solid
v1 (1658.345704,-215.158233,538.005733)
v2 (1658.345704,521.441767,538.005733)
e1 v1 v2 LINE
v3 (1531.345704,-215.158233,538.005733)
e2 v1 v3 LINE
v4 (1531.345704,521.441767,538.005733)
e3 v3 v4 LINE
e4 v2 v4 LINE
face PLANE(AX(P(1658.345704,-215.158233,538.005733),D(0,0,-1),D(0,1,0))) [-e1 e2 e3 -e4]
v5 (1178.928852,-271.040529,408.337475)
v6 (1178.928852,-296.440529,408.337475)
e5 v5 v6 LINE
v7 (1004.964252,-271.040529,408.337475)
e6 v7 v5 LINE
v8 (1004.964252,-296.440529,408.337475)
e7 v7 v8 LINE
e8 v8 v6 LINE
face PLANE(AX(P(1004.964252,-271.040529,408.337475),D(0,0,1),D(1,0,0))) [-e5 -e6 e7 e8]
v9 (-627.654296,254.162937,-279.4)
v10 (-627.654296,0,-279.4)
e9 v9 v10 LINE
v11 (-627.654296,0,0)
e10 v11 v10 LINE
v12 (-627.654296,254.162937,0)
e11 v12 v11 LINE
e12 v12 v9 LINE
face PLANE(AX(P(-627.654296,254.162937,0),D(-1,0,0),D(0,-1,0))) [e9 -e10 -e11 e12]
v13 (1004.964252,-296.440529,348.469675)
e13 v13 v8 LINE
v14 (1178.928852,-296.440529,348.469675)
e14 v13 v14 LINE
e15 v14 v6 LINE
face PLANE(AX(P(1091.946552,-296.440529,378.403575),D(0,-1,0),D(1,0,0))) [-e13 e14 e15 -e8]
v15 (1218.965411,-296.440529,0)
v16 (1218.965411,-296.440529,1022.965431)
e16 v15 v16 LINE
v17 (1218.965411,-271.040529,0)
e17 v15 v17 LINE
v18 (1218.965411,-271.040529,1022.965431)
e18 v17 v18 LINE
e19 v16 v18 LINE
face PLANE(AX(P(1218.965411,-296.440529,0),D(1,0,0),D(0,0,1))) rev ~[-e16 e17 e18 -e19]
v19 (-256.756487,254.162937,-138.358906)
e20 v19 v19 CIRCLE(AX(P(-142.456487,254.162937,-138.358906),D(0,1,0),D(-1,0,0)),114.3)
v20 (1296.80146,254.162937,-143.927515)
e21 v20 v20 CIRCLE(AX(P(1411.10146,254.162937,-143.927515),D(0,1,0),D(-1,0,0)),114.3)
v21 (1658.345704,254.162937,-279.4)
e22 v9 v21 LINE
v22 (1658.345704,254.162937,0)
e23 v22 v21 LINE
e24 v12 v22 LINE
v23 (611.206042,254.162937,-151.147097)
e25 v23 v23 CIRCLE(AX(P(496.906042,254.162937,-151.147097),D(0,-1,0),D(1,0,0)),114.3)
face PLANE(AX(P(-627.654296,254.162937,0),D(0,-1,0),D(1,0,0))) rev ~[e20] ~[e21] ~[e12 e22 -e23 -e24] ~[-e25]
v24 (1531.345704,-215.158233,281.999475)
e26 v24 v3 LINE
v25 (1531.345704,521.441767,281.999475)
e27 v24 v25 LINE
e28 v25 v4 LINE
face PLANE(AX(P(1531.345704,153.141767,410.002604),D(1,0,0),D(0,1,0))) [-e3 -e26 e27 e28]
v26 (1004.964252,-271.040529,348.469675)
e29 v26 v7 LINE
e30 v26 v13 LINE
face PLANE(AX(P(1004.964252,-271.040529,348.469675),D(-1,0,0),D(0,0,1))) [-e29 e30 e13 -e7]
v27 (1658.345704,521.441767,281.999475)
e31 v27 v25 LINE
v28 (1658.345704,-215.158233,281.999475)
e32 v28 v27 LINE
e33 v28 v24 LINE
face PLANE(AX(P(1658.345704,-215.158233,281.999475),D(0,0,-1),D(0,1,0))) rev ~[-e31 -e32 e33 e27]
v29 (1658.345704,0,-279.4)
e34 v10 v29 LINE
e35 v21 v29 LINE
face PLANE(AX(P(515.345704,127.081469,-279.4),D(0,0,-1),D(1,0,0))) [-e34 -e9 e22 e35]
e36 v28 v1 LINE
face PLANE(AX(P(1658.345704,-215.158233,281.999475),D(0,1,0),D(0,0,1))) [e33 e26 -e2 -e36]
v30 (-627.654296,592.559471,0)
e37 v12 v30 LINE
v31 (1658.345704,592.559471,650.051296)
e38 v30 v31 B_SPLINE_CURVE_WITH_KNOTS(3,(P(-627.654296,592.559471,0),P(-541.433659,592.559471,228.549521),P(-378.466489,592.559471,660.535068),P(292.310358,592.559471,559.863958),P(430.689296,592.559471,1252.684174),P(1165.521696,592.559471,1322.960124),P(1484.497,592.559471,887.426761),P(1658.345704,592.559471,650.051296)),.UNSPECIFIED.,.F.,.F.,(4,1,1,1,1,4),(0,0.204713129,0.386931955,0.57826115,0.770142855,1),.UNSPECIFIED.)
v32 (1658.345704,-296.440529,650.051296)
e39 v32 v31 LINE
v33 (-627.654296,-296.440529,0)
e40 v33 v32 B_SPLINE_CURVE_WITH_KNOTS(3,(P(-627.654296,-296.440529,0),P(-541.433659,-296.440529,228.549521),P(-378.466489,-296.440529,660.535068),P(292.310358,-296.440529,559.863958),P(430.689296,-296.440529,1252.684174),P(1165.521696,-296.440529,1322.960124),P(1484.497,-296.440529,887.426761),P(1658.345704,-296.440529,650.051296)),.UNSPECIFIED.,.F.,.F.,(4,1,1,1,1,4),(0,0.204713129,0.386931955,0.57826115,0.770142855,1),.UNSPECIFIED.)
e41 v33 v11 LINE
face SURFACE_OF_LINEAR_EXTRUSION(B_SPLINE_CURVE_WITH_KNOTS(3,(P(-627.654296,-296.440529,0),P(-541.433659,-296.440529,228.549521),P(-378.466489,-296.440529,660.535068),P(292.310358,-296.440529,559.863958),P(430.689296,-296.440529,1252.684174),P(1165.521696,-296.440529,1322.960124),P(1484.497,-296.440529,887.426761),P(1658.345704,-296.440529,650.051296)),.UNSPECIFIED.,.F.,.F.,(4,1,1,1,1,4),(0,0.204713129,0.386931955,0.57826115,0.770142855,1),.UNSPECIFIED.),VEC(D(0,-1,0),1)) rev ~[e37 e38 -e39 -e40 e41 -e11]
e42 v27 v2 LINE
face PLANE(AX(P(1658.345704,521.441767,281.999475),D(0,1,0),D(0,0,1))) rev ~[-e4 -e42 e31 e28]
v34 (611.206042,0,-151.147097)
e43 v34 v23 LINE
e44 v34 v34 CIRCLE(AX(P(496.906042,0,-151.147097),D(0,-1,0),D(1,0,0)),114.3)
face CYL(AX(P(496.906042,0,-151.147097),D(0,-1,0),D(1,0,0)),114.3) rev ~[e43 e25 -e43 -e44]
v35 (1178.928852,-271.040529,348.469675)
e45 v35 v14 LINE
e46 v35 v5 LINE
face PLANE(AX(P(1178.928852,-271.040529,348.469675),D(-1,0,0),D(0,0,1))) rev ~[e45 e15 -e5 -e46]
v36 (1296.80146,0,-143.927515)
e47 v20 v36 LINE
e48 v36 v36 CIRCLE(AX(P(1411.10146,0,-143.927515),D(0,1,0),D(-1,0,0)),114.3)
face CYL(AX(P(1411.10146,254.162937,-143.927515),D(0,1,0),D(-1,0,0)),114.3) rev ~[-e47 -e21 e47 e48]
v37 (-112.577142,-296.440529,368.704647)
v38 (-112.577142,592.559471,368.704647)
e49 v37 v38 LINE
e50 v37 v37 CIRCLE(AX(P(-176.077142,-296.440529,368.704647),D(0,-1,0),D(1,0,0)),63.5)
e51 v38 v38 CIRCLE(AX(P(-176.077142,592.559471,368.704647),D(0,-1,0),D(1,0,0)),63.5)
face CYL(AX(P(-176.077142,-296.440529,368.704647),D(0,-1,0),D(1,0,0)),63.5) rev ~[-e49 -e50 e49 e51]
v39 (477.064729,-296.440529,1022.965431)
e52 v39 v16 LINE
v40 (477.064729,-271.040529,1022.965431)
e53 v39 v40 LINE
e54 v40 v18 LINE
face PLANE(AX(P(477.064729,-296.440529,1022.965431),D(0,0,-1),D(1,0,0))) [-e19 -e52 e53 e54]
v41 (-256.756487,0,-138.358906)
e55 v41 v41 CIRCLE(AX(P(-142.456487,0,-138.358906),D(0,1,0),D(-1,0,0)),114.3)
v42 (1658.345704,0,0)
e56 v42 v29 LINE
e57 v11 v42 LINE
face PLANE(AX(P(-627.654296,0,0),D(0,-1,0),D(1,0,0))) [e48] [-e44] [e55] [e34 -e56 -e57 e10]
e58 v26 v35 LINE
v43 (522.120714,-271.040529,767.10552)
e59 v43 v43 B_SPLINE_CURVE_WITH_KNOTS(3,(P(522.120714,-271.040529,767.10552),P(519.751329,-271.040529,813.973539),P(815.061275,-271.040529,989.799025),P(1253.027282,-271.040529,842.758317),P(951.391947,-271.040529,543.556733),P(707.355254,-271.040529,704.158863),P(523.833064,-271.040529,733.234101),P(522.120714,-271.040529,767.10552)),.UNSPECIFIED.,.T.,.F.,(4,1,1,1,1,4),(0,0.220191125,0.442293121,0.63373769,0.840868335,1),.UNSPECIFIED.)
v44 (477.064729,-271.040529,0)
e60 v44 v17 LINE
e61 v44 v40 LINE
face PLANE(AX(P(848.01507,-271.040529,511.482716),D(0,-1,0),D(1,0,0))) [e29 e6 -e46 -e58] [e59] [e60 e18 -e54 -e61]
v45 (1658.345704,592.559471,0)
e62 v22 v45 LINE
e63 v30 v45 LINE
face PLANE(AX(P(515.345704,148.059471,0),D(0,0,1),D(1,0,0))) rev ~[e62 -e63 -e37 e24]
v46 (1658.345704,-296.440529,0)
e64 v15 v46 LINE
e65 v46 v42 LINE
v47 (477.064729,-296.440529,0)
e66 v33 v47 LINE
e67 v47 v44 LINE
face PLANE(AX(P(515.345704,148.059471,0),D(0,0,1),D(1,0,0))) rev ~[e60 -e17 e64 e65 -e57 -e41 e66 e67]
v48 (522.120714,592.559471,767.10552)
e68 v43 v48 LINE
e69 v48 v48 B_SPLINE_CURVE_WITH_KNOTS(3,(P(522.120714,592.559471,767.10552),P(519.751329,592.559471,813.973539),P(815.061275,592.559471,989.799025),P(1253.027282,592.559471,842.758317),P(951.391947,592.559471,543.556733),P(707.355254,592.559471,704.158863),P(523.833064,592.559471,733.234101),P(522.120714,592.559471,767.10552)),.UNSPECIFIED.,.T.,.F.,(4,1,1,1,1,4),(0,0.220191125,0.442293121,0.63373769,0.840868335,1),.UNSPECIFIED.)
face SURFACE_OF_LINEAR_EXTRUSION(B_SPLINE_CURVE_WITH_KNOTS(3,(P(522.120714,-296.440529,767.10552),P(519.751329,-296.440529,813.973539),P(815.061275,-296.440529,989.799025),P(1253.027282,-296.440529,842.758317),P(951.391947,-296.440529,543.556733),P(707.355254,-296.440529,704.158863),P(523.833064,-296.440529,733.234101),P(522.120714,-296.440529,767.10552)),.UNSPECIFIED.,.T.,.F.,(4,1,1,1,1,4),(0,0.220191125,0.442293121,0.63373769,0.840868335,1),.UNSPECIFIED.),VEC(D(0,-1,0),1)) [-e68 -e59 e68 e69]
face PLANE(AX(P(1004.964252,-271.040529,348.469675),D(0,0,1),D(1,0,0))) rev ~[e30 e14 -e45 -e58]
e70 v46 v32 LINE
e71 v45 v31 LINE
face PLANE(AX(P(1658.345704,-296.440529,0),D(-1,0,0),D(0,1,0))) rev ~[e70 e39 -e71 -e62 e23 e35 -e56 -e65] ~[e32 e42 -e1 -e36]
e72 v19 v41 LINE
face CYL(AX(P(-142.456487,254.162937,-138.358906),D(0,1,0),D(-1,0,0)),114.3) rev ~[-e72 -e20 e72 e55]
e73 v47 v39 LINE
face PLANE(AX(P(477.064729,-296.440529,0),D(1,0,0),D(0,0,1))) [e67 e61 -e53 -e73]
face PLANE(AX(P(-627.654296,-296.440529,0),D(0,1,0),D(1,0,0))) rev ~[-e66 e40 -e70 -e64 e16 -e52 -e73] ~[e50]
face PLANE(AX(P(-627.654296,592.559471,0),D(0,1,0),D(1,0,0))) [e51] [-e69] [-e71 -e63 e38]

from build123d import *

# Parameters (mm, degrees)
F0_W      = 2286
F0_H      = 889
F1_DEPTH  = 1778
F3_DEPTH  = 889
F5_DEPTH  = 889
F6_W      = 736.6
F6_H      = 256.0062574527
F7_DEPTH  = 127
F8_W      = 2286
F8_H      = 254.1629374027
F9_DEPTH  = 279.4
F10_R     = 114.3
F11_DEPTH = 381
F12_R     = 114.3
F13_DEPTH = 381
F14_W     = 741.9006824493
F14_H     = 1022.9654312134
F15_DEPTH = 25.4
F16_W     = 173.9646
F16_H     = 59.8678
F17_DEPTH = 25.4
F18_R     = 63.5
F19_DEPTH = 889
F20_R     = 114.3
F21_DEPTH = 381


# Not quite as in the source:
# - a feature names something its author has since deleted; it is built from what else it names


with BuildPart() as f1:
    # F0 (on Top) → F1 (new body)
    with BuildSketch(Plane.XY):
        with Locations((515.3457043618, 148.0594710579)):
            Rectangle(F0_W, F0_H)
    extrude(amount=F1_DEPTH)

    # F2 (on face) → F3 (cut)
    with BuildSketch(Plane.XZ.offset(296.4405289421)):
        with BuildLine():
            Line((-627.6542956382, 1778), (-627.6542956382, 0))
            add(Edge.make_bspline(
                [(-627.6542956382, 0), (-541.4336594546, 228.5495208712), (-378.466489085, 660.5350681174), (292.3103575218, 559.8639582491), (430.6892955486, 1252.6841744519), (1165.5216956238, 1322.9601242052), (1484.4969995752, 887.4267608137), (1658.3457043618, 650.0512957573)],
                knots=[0, 0, 0, 0, 0.2047131286, 0.3869319548, 0.5782611503, 0.7701428547, 1, 1, 1, 1], degree=3))
            Line((1658.3457043618, 650.0512957573), (1658.3457043618, 1778))
            Line((1658.3457043618, 1778), (-627.6542956382, 1778))
        make_face()
    extrude(amount=-F3_DEPTH, mode=Mode.SUBTRACT)

    # F4 (on face) → F5 (cut)
    with BuildSketch(Plane.XZ.offset(296.4405289421)):
        with BuildLine():
            add(Edge.make_bspline(
                [(522.1207141876, 767.1055197716), (519.7513293275, 813.9735385683), (815.0612749868, 989.7990248624), (1253.0272817349, 842.7583173423), (951.3919468713, 543.5567329303), (707.3552544441, 704.1588627621), (523.8330636603, 733.2341008126), (522.1207141876, 767.1055197716)],
                knots=[0, 0, 0, 0, 0.2201911252, 0.4422931214, 0.6337376897, 0.8408683353, 1, 1, 1, 1], degree=3))
        make_face()
    extrude(amount=-F5_DEPTH, mode=Mode.SUBTRACT)

    # F6 (on face) → F7 (cut)
    with BuildSketch(Plane.YZ.offset(1658.3457043618)):
        with Locations((153.1417667866, 410.0026041269)):
            Rectangle(F6_W, F6_H)
    extrude(amount=-F7_DEPTH, mode=Mode.SUBTRACT)

    # F8 (on face) → F9 (join)
    with BuildSketch(Plane(origin=(0, 0, 0), x_dir=(1, 0, 0), z_dir=(0, 0, -1))):
        with Locations((515.3457043618, -127.0814687014)):
            Rectangle(F8_W, F8_H)
    extrude(amount=F9_DEPTH)

    # F10 (on face) → F11 (cut)
    with BuildSketch(Plane(origin=(0, 254.1629374027, 0), x_dir=(-1, 0, 0), z_dir=(0, 1, 0))):
        with Locations((-1411.1014604568, -143.9275145531)):
            Circle(F10_R)
    extrude(amount=-F11_DEPTH, mode=Mode.SUBTRACT)

    # F12 (on face) → F13 (cut)
    with BuildSketch(Plane.XZ):
        with Locations((496.906042099, -151.1470973492)):
            Circle(F12_R)
    extrude(amount=-F13_DEPTH, mode=Mode.SUBTRACT)

    # F14 (on face) → F15 (cut)
    with BuildSketch(Plane.XZ.offset(296.4405289421)):
        with Locations((848.0150699615, 511.4827156067)):
            Rectangle(F14_W, F14_H)
        with BuildLine():
            add(Edge.make_bspline(
                [(522.1207141876, 767.1055197716), (519.7513293275, 813.9735385683), (815.0612749868, 989.7990248624), (1253.0272817349, 842.7583173423), (951.3919468713, 543.5567329303), (707.3552544441, 704.1588627621), (523.8330636603, 733.2341008126), (522.1207141876, 767.1055197716)],
                knots=[0, 0, 0, 0, 0.2201911252, 0.4422931214, 0.6337376897, 0.8408683353, 1, 1, 1, 1], degree=3))
        make_face(mode=Mode.SUBTRACT)
    extrude(amount=-F15_DEPTH, mode=Mode.SUBTRACT)

    # F16 (on face) → F17 (join)
    with BuildSketch(Plane.XZ.offset(271.0405289421)):
        with Locations((1091.9465520813, 378.4035745872)):
            Rectangle(F16_W, F16_H)
    extrude(amount=F17_DEPTH)

    # F18 (on face) → F19 (cut)
    with BuildSketch(Plane.XZ.offset(296.4405289421)):
        with Locations((-176.0771423578, 368.7046468258)):
            Circle(F18_R)
    extrude(amount=-F19_DEPTH, mode=Mode.SUBTRACT)

    # F20 (on face) → F21 (cut)
    with BuildSketch(Plane(origin=(0, 254.1629374027, 0), x_dir=(-1, 0, 0), z_dir=(0, 1, 0))):
        with Locations((142.4564868212, -138.3589059114)):
            Circle(F20_R)
    extrude(amount=-F21_DEPTH, mode=Mode.SUBTRACT)


solid = f1.part
